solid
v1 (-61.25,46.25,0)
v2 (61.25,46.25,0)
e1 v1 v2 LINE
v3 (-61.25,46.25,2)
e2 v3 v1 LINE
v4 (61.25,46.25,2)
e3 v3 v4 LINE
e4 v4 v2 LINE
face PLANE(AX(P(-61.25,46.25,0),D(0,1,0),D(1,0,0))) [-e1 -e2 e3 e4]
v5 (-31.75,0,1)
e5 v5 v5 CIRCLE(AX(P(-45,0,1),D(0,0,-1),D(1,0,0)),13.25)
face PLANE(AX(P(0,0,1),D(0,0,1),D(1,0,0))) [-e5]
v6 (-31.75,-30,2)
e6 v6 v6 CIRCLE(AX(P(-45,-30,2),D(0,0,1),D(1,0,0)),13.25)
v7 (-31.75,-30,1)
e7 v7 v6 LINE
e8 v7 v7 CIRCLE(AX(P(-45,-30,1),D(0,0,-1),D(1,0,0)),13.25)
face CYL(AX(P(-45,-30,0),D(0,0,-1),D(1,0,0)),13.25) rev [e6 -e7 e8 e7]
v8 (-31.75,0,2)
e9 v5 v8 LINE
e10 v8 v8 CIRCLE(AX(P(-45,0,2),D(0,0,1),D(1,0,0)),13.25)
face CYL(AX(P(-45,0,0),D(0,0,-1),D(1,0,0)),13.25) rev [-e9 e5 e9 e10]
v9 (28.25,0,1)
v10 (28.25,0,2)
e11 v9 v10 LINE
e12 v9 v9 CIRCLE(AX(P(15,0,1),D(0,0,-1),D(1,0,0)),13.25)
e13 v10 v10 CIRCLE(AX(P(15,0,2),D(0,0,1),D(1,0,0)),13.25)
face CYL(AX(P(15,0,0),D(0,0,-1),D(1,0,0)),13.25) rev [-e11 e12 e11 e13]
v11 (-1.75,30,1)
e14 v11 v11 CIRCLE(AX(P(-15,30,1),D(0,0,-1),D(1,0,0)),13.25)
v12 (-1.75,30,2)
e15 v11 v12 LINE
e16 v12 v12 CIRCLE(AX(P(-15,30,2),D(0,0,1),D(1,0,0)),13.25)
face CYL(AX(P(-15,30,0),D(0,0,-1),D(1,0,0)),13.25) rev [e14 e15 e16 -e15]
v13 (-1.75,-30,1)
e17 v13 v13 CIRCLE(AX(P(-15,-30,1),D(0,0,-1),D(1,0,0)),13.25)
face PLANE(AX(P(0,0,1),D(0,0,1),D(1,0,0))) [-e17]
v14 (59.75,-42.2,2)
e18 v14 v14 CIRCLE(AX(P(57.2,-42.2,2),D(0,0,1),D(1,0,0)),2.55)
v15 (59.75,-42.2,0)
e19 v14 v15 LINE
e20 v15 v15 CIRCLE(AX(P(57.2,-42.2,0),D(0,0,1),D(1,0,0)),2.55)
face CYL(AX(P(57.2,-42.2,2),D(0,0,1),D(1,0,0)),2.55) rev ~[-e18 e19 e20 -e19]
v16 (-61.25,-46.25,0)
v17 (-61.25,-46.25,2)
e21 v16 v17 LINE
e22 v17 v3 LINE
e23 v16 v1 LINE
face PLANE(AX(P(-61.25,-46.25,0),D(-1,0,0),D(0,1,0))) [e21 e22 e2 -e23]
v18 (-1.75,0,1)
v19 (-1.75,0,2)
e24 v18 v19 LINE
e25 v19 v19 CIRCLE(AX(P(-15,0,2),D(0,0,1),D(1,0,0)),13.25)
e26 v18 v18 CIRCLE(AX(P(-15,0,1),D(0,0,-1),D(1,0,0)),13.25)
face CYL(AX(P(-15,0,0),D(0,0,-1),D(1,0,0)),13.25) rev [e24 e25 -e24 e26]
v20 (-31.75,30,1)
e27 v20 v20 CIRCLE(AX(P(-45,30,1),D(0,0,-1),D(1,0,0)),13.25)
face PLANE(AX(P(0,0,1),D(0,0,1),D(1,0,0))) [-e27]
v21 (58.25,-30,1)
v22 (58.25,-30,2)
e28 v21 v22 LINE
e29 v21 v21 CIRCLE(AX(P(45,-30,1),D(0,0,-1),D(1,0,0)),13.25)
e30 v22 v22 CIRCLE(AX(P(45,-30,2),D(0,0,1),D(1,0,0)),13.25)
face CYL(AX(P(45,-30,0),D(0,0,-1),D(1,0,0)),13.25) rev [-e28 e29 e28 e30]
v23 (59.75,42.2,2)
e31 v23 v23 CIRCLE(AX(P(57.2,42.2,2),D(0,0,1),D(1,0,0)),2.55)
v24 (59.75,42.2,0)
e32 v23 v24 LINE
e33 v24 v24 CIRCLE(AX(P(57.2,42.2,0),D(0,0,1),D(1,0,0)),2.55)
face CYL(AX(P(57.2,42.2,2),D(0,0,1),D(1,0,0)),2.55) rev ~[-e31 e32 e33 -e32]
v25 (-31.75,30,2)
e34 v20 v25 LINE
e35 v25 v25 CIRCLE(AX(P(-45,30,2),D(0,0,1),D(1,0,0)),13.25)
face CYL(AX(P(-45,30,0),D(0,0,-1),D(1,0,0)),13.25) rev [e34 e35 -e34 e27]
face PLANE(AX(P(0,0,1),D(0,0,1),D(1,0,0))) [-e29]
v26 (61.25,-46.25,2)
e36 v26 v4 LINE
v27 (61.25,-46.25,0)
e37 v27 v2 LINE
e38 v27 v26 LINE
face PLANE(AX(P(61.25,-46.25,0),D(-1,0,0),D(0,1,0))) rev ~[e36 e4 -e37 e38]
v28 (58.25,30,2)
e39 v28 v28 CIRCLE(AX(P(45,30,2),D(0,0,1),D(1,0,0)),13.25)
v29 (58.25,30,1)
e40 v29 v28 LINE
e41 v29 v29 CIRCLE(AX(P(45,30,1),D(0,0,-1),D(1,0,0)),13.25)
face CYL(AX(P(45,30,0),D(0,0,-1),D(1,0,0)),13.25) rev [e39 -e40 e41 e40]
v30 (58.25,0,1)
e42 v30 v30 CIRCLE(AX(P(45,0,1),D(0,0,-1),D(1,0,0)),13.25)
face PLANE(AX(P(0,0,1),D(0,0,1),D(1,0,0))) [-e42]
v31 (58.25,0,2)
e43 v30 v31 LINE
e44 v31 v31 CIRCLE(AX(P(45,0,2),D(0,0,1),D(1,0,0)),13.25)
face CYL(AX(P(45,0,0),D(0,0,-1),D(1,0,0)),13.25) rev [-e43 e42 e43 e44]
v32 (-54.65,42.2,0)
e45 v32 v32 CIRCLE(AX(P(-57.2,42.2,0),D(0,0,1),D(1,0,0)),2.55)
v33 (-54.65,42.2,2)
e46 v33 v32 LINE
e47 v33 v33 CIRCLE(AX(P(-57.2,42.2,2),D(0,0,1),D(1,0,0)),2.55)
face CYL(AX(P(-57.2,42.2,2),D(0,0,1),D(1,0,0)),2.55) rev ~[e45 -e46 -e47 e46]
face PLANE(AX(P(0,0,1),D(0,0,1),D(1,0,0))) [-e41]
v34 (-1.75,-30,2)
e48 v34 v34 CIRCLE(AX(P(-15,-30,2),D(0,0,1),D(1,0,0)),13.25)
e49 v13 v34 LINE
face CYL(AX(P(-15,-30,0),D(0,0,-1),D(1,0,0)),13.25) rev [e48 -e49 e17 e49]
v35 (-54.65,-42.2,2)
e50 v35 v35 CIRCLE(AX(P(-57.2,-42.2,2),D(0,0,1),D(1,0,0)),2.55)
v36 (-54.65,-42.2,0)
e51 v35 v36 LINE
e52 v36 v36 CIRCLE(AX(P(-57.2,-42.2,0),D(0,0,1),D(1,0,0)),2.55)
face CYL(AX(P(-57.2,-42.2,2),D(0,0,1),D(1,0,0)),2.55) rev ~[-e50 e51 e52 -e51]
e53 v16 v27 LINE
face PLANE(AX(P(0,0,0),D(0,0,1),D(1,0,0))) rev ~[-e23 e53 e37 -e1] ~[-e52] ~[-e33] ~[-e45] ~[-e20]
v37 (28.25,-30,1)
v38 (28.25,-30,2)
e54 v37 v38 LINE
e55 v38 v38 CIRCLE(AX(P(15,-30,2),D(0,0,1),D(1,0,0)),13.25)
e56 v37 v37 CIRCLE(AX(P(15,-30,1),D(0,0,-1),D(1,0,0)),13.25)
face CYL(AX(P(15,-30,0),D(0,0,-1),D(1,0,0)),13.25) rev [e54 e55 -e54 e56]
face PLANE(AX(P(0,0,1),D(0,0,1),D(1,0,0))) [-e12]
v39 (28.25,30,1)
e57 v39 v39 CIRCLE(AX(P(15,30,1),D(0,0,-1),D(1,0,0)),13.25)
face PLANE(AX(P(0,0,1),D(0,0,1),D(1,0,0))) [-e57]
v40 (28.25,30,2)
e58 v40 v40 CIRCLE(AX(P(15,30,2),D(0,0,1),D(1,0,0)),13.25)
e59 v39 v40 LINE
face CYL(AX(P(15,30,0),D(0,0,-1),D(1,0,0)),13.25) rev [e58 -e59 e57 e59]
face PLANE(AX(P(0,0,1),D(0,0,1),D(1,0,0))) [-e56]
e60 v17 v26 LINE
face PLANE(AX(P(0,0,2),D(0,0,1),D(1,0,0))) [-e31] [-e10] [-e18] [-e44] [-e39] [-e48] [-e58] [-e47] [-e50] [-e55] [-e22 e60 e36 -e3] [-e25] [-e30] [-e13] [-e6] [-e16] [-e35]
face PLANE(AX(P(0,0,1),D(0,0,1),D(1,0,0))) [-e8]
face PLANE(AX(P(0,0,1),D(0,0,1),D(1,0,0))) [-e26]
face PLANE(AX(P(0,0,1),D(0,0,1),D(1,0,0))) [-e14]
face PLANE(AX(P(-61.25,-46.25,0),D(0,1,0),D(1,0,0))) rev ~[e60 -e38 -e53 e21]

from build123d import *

# Parameters (mm, degrees)
F0_W     = 122.5
F0_H     = 92.5
F0_R     = 13.25
F1_DEPTH = 1
F2_DEPTH = 2
F3_R     = 2.55
F4_DEPTH = 2.001


# Not quite as in the source:
# - a feature names something its author has since deleted; it is built from what else it names


with BuildPart() as f1:
    # F0 (on Top) → F1 (new body)
    with BuildSketch(Plane.XY):
        Rectangle(F0_W, F0_H)
        with Locations((-45, -30)):
            Circle(F0_R, mode=Mode.SUBTRACT)
        with Locations((-15, -30)):
            Circle(F0_R, mode=Mode.SUBTRACT)
        with Locations((15, -30)):
            Circle(F0_R, mode=Mode.SUBTRACT)
        with Locations((45, -30)):
            Circle(F0_R, mode=Mode.SUBTRACT)
        with Locations((-45, 0)):
            Circle(F0_R, mode=Mode.SUBTRACT)
        with Locations((-15, 0)):
            Circle(F0_R, mode=Mode.SUBTRACT)
        with Locations((-45, 30)):
            Circle(F0_R, mode=Mode.SUBTRACT)
        with Locations((-15, 30)):
            Circle(F0_R, mode=Mode.SUBTRACT)
        with Locations((15, 0)):
            Circle(F0_R, mode=Mode.SUBTRACT)
        with Locations((45, 0)):
            Circle(F0_R, mode=Mode.SUBTRACT)
        with Locations((15, 30)):
            Circle(F0_R, mode=Mode.SUBTRACT)
        with Locations((45, 30)):
            Circle(F0_R, mode=Mode.SUBTRACT)
        with Locations((-45, 30)):
            Circle(F0_R)
        with Locations((-15, 30)):
            Circle(F0_R)
        with Locations((15, 30)):
            Circle(F0_R)
        with Locations((45, 30)):
            Circle(F0_R)
        with Locations((45, 0)):
            Circle(F0_R)
        with Locations((-15, 0)):
            Circle(F0_R)
        with Locations((-45, 0)):
            Circle(F0_R)
        with Locations((15, 0)):
            Circle(F0_R)
        with Locations((15, -30)):
            Circle(F0_R)
        with Locations((-15, -30)):
            Circle(F0_R)
        with Locations((-45, -30)):
            Circle(F0_R)
        with Locations((45, -30)):
            Circle(F0_R)
    extrude(amount=F1_DEPTH)

    # F0 (on Top) → F2 (join)
    with BuildSketch(Plane.XY):
        Rectangle(F0_W, F0_H)
        with Locations((-45, -30)):
            Circle(F0_R, mode=Mode.SUBTRACT)
        with Locations((-15, -30)):
            Circle(F0_R, mode=Mode.SUBTRACT)
        with Locations((15, -30)):
            Circle(F0_R, mode=Mode.SUBTRACT)
        with Locations((45, -30)):
            Circle(F0_R, mode=Mode.SUBTRACT)
        with Locations((-45, 0)):
            Circle(F0_R, mode=Mode.SUBTRACT)
        with Locations((-15, 0)):
            Circle(F0_R, mode=Mode.SUBTRACT)
        with Locations((-45, 30)):
            Circle(F0_R, mode=Mode.SUBTRACT)
        with Locations((-15, 30)):
            Circle(F0_R, mode=Mode.SUBTRACT)
        with Locations((15, 0)):
            Circle(F0_R, mode=Mode.SUBTRACT)
        with Locations((45, 0)):
            Circle(F0_R, mode=Mode.SUBTRACT)
        with Locations((15, 30)):
            Circle(F0_R, mode=Mode.SUBTRACT)
        with Locations((45, 30)):
            Circle(F0_R, mode=Mode.SUBTRACT)
    extrude(amount=F2_DEPTH)

    # F3 (on face) → F4 (cut, through all)
    with BuildSketch(Plane.XY.offset(2)):
        with Locations((-57.2, 42.2)):
            Circle(F3_R)
        with Locations((57.2, 42.2)):
            Circle(F3_R)
        with Locations((-57.2, -42.2)):
            Circle(F3_R)
        with Locations((57.2, -42.2)):
            Circle(F3_R)
    extrude(amount=-F4_DEPTH, mode=Mode.SUBTRACT)


solid = f1.part
